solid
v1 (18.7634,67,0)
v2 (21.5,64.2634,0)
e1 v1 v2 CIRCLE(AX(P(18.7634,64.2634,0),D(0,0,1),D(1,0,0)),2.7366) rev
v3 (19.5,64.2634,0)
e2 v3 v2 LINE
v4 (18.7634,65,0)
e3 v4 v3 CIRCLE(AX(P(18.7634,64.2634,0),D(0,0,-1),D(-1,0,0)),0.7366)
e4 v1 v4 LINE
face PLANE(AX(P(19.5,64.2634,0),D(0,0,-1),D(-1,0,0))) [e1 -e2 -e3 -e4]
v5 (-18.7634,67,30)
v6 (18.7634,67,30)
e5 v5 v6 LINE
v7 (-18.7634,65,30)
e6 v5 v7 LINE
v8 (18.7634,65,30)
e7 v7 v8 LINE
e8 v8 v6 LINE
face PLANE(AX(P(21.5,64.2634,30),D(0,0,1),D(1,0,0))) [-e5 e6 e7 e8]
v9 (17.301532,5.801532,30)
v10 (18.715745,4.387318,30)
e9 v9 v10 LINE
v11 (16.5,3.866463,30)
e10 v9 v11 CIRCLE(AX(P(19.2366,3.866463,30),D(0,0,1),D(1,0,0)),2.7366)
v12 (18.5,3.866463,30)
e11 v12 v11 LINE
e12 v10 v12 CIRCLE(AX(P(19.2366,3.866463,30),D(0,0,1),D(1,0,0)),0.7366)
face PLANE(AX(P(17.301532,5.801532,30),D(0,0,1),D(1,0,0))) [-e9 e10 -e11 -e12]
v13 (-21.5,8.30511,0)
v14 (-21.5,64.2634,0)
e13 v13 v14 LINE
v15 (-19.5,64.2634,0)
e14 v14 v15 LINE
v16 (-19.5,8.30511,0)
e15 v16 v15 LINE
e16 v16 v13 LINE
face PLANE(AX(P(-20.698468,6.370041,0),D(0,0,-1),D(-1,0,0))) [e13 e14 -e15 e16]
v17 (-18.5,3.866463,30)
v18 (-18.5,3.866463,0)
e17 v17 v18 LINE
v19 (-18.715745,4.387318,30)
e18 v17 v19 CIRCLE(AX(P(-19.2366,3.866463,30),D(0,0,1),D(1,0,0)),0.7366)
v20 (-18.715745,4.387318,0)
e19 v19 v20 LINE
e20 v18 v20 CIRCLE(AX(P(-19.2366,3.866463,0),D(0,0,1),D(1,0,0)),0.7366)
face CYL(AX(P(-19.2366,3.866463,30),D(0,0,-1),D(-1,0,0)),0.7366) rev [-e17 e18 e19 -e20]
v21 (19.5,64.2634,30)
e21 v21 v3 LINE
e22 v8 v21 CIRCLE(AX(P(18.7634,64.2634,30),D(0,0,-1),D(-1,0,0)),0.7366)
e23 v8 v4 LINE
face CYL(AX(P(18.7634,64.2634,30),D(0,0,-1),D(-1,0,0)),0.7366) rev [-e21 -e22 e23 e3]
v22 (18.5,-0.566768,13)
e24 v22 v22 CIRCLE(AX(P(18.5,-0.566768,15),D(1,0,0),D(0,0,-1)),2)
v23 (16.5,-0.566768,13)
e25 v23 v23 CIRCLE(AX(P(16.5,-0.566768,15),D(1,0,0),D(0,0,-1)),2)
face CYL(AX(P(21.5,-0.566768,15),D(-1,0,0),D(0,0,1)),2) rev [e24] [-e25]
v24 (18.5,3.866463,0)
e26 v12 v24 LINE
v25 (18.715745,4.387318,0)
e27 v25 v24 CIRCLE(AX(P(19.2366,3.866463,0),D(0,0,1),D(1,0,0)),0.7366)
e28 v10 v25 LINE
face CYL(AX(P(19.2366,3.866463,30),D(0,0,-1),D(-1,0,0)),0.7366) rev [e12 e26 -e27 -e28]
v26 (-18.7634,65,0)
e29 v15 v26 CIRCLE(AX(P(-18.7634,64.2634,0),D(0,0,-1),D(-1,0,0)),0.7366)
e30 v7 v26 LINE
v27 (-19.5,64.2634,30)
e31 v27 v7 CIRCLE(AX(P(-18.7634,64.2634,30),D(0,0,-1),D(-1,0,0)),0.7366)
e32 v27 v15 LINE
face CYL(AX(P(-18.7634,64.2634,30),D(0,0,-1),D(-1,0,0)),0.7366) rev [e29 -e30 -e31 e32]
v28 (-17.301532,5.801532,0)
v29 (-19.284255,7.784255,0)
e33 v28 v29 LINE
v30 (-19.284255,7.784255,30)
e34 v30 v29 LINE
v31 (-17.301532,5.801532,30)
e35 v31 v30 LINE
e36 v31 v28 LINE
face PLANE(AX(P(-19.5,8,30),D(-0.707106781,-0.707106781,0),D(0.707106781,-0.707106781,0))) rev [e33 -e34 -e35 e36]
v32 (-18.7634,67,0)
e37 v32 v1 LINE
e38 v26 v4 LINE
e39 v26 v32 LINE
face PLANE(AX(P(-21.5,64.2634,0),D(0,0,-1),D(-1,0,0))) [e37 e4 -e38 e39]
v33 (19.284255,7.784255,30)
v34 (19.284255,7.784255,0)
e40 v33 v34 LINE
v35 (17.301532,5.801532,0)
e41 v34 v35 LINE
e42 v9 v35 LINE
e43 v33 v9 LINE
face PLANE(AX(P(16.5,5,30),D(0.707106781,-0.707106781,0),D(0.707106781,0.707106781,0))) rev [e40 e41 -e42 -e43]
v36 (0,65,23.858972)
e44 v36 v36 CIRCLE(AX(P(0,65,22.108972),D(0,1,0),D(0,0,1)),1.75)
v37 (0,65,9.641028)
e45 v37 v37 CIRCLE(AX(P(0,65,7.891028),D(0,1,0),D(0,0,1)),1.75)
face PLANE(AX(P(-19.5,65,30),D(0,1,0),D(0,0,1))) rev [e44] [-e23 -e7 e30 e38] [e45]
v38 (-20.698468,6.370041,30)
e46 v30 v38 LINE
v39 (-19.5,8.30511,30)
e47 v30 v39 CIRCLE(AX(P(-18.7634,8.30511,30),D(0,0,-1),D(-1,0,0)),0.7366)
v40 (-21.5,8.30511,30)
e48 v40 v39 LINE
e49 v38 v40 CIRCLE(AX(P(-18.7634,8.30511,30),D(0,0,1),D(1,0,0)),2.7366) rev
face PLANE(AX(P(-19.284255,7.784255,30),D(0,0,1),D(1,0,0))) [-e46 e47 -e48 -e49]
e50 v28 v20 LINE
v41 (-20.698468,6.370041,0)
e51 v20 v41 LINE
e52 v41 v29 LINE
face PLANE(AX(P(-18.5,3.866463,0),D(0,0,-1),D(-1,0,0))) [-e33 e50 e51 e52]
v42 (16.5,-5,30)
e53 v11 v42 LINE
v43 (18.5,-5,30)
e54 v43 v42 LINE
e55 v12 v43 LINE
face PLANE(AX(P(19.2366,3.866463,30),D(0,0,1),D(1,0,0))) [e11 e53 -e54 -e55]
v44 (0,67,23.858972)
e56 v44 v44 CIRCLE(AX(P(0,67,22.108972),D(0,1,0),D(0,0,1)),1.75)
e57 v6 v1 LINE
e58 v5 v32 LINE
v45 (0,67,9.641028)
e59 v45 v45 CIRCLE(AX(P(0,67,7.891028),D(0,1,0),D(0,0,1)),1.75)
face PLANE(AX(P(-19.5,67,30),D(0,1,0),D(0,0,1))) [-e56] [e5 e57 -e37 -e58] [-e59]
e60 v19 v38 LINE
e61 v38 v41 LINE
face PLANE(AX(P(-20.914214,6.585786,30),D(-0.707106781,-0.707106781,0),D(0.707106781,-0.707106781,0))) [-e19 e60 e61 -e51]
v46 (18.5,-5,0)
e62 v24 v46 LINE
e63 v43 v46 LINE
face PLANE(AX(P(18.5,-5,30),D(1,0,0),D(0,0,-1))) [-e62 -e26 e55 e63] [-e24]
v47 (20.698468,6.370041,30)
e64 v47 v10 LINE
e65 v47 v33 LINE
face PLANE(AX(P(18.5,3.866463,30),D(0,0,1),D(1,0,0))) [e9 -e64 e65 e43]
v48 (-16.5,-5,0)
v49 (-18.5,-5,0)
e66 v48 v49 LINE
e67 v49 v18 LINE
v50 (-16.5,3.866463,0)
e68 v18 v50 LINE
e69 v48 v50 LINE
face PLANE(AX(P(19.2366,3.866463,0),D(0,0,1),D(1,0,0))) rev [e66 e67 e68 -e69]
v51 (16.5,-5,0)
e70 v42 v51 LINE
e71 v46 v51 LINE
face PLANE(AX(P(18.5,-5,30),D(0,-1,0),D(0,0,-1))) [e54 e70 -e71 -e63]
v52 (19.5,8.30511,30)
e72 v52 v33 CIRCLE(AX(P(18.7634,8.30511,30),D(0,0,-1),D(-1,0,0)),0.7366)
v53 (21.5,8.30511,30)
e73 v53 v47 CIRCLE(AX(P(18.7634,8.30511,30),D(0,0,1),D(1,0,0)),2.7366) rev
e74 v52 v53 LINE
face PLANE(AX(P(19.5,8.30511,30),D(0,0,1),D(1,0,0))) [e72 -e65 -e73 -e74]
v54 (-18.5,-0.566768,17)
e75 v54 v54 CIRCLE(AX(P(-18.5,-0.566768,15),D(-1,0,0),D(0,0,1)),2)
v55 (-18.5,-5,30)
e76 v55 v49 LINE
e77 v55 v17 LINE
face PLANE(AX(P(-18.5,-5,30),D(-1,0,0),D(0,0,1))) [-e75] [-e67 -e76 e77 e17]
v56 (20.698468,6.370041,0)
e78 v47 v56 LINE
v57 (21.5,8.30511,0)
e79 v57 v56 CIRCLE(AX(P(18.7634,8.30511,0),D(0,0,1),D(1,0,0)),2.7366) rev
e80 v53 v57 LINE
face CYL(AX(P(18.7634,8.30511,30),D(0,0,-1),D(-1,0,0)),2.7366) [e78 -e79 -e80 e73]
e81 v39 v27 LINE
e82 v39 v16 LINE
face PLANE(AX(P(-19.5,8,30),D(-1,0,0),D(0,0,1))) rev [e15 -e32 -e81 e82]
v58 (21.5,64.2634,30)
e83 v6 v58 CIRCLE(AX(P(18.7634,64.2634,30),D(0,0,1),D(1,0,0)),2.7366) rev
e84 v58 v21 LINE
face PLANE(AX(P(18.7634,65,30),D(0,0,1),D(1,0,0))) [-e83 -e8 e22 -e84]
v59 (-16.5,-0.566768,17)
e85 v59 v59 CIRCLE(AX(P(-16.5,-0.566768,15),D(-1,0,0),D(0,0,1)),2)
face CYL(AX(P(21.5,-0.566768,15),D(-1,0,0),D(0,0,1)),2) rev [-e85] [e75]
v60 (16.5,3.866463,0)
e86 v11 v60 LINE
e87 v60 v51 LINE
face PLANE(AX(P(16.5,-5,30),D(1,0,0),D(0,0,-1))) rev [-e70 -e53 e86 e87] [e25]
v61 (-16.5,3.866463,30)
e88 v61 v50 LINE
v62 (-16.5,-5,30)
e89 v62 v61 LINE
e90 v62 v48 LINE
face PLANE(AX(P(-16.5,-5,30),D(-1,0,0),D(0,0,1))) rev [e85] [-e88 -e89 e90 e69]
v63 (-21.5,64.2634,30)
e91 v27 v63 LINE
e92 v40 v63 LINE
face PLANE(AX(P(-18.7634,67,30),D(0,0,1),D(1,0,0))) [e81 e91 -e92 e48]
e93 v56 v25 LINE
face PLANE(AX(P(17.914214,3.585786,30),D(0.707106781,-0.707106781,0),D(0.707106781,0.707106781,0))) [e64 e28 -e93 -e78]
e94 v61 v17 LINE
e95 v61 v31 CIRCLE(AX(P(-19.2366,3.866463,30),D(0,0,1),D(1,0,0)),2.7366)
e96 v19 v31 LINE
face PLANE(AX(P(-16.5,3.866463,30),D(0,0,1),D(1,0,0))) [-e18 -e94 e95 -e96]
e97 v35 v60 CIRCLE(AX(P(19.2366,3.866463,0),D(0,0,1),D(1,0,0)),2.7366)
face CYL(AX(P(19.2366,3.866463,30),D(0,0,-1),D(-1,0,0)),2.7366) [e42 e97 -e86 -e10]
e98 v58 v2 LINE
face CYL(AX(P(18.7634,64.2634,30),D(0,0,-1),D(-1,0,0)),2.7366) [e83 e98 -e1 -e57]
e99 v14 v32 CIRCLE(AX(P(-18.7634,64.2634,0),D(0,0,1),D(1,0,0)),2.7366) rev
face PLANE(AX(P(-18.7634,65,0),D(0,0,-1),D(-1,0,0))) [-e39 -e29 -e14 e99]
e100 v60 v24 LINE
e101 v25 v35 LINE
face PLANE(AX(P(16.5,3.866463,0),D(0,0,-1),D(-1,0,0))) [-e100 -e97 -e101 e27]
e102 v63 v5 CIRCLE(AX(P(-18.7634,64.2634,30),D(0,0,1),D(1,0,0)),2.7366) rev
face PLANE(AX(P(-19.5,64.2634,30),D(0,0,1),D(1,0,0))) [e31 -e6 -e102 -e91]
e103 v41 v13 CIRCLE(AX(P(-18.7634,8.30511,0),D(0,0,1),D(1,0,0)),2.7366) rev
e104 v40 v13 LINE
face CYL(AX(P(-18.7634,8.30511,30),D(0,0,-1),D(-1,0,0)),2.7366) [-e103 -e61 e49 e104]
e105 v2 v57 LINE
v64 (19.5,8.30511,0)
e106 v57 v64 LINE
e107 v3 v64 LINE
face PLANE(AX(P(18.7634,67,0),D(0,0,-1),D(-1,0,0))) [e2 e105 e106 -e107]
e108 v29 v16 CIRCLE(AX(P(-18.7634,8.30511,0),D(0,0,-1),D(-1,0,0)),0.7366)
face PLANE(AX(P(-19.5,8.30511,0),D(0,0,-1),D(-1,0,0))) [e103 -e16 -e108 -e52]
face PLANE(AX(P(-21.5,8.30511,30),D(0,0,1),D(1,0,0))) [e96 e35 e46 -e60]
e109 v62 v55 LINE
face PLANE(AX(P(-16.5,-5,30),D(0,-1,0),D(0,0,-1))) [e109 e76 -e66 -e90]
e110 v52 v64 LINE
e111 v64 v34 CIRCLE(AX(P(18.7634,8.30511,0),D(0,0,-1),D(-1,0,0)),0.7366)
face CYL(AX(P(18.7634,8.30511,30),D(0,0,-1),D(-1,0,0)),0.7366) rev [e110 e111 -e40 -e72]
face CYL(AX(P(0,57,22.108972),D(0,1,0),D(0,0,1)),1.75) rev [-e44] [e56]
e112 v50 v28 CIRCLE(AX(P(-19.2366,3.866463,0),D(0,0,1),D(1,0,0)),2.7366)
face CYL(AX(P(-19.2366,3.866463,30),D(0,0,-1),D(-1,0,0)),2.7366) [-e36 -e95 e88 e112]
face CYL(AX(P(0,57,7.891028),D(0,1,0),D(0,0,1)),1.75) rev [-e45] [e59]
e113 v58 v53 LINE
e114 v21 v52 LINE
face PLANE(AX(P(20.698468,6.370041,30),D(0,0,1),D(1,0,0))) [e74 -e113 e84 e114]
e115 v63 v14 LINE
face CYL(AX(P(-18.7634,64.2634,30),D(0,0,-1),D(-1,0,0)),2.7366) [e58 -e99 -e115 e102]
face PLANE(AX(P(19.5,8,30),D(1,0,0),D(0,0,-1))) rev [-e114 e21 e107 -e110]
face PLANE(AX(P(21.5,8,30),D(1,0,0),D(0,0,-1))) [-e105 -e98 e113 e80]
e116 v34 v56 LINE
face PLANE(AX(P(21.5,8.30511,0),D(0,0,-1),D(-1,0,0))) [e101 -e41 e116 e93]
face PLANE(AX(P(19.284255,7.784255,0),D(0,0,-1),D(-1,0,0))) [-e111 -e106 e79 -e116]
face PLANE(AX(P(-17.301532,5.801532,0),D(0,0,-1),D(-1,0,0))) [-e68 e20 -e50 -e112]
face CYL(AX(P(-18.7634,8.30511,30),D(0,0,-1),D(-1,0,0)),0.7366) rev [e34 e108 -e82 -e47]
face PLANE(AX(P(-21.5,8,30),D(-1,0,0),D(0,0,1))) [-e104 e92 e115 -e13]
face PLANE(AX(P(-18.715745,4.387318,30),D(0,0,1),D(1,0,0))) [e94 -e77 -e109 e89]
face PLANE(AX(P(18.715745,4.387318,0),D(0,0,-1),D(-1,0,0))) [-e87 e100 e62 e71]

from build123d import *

# Parameters (mm, degrees)
BASE_FLANGE1_DEPTH = 30
SKETCH9_R          = 2
CUT_EXTRUDE1_DEPTH = 84.600239234
SKETCH10_R         = 1.75
CUT_EXTRUDE2_DEPTH = 10


# Sheet-metal steps are written as plain solids
with BuildPart() as part:
    # Sketch1 → Base-Flange1 (new body)
    with BuildSketch(Plane.XY):
        with BuildLine():
            Line((-16.5, -5), (-16.5, 3.866463165))
            ThreePointArc((-16.5, 3.866463165), (-16.708311271, 4.913714646), (-17.301531583, 5.801531583))
            Line((-17.301531583, 5.801531583), (-19.284254855, 7.784254855))
            ThreePointArc((-19.284254855, 7.784254855), (-19.443929664, 8.023225094), (-19.5, 8.30510971))
            Line((-19.5, 8.30510971), (-19.5, 64.2634))
            ThreePointArc((-19.5, 64.2634), (-19.284254855, 64.784254855), (-18.7634, 65))
            Line((-18.7634, 65), (18.7634, 65))
            ThreePointArc((18.7634, 65), (19.284254855, 64.784254855), (19.5, 64.2634))
            Line((19.5, 64.2634), (19.5, 8.30510971))
            ThreePointArc((19.5, 8.30510971), (19.443929664, 8.023225094), (19.284254855, 7.784254855))
            Line((19.284254855, 7.784254855), (17.301531583, 5.801531583))
            ThreePointArc((17.301531583, 5.801531583), (16.708311271, 4.913714646), (16.5, 3.866463165))
            Line((16.5, 3.866463165), (16.5, -5))
            Line((16.5, -5), (18.5, -5))
            Line((18.5, -5), (18.5, 3.866463165))
            ThreePointArc((18.5, 3.866463165), (18.556070336, 4.148347781), (18.715745145, 4.38731802))
            Line((18.715745145, 4.38731802), (20.698468417, 6.370041293))
            ThreePointArc((20.698468417, 6.370041293), (21.291688729, 7.257858229), (21.5, 8.30510971))
            Line((21.5, 8.30510971), (21.5, 64.2634))
            ThreePointArc((21.5, 64.2634), (20.698468417, 66.198468417), (18.7634, 67))
            Line((18.7634, 67), (-18.7634, 67))
            ThreePointArc((-18.7634, 67), (-20.698468417, 66.198468417), (-21.5, 64.2634))
            Line((-21.5, 64.2634), (-21.5, 8.30510971))
            ThreePointArc((-21.5, 8.30510971), (-21.291688729, 7.257858229), (-20.698468417, 6.370041293))
            Line((-20.698468417, 6.370041293), (-18.715745145, 4.38731802))
            ThreePointArc((-18.715745145, 4.38731802), (-18.556070336, 4.148347781), (-18.5, 3.866463165))
            Line((-18.5, 3.866463165), (-18.5, -5))
            Line((-18.5, -5), (-16.5, -5))
        make_face()
    extrude(amount=BASE_FLANGE1_DEPTH)

    # Sketch9 → Cut-Extrude1 (cut, through all)
    with BuildSketch(Plane.ZY.offset(18.5)):
        with Locations((15, -0.566768417)):
            Circle(SKETCH9_R)
    extrude(amount=-CUT_EXTRUDE1_DEPTH, mode=Mode.SUBTRACT)

    # Sketch10 → Cut-Extrude2 (cut)
    with BuildSketch(Plane(origin=(0, 67, 0), x_dir=(1, 0, 0), z_dir=(0, 1, 0))):
        with Locations(Location((0, -22.108972385, 0), (0, 0, 270))):
            Circle(SKETCH10_R)
        with Locations(Location((0, -7.891027615, 0), (0, 0, 270))):
            Circle(SKETCH10_R)
    extrude(amount=-CUT_EXTRUDE2_DEPTH, mode=Mode.SUBTRACT)


solid = part.part
